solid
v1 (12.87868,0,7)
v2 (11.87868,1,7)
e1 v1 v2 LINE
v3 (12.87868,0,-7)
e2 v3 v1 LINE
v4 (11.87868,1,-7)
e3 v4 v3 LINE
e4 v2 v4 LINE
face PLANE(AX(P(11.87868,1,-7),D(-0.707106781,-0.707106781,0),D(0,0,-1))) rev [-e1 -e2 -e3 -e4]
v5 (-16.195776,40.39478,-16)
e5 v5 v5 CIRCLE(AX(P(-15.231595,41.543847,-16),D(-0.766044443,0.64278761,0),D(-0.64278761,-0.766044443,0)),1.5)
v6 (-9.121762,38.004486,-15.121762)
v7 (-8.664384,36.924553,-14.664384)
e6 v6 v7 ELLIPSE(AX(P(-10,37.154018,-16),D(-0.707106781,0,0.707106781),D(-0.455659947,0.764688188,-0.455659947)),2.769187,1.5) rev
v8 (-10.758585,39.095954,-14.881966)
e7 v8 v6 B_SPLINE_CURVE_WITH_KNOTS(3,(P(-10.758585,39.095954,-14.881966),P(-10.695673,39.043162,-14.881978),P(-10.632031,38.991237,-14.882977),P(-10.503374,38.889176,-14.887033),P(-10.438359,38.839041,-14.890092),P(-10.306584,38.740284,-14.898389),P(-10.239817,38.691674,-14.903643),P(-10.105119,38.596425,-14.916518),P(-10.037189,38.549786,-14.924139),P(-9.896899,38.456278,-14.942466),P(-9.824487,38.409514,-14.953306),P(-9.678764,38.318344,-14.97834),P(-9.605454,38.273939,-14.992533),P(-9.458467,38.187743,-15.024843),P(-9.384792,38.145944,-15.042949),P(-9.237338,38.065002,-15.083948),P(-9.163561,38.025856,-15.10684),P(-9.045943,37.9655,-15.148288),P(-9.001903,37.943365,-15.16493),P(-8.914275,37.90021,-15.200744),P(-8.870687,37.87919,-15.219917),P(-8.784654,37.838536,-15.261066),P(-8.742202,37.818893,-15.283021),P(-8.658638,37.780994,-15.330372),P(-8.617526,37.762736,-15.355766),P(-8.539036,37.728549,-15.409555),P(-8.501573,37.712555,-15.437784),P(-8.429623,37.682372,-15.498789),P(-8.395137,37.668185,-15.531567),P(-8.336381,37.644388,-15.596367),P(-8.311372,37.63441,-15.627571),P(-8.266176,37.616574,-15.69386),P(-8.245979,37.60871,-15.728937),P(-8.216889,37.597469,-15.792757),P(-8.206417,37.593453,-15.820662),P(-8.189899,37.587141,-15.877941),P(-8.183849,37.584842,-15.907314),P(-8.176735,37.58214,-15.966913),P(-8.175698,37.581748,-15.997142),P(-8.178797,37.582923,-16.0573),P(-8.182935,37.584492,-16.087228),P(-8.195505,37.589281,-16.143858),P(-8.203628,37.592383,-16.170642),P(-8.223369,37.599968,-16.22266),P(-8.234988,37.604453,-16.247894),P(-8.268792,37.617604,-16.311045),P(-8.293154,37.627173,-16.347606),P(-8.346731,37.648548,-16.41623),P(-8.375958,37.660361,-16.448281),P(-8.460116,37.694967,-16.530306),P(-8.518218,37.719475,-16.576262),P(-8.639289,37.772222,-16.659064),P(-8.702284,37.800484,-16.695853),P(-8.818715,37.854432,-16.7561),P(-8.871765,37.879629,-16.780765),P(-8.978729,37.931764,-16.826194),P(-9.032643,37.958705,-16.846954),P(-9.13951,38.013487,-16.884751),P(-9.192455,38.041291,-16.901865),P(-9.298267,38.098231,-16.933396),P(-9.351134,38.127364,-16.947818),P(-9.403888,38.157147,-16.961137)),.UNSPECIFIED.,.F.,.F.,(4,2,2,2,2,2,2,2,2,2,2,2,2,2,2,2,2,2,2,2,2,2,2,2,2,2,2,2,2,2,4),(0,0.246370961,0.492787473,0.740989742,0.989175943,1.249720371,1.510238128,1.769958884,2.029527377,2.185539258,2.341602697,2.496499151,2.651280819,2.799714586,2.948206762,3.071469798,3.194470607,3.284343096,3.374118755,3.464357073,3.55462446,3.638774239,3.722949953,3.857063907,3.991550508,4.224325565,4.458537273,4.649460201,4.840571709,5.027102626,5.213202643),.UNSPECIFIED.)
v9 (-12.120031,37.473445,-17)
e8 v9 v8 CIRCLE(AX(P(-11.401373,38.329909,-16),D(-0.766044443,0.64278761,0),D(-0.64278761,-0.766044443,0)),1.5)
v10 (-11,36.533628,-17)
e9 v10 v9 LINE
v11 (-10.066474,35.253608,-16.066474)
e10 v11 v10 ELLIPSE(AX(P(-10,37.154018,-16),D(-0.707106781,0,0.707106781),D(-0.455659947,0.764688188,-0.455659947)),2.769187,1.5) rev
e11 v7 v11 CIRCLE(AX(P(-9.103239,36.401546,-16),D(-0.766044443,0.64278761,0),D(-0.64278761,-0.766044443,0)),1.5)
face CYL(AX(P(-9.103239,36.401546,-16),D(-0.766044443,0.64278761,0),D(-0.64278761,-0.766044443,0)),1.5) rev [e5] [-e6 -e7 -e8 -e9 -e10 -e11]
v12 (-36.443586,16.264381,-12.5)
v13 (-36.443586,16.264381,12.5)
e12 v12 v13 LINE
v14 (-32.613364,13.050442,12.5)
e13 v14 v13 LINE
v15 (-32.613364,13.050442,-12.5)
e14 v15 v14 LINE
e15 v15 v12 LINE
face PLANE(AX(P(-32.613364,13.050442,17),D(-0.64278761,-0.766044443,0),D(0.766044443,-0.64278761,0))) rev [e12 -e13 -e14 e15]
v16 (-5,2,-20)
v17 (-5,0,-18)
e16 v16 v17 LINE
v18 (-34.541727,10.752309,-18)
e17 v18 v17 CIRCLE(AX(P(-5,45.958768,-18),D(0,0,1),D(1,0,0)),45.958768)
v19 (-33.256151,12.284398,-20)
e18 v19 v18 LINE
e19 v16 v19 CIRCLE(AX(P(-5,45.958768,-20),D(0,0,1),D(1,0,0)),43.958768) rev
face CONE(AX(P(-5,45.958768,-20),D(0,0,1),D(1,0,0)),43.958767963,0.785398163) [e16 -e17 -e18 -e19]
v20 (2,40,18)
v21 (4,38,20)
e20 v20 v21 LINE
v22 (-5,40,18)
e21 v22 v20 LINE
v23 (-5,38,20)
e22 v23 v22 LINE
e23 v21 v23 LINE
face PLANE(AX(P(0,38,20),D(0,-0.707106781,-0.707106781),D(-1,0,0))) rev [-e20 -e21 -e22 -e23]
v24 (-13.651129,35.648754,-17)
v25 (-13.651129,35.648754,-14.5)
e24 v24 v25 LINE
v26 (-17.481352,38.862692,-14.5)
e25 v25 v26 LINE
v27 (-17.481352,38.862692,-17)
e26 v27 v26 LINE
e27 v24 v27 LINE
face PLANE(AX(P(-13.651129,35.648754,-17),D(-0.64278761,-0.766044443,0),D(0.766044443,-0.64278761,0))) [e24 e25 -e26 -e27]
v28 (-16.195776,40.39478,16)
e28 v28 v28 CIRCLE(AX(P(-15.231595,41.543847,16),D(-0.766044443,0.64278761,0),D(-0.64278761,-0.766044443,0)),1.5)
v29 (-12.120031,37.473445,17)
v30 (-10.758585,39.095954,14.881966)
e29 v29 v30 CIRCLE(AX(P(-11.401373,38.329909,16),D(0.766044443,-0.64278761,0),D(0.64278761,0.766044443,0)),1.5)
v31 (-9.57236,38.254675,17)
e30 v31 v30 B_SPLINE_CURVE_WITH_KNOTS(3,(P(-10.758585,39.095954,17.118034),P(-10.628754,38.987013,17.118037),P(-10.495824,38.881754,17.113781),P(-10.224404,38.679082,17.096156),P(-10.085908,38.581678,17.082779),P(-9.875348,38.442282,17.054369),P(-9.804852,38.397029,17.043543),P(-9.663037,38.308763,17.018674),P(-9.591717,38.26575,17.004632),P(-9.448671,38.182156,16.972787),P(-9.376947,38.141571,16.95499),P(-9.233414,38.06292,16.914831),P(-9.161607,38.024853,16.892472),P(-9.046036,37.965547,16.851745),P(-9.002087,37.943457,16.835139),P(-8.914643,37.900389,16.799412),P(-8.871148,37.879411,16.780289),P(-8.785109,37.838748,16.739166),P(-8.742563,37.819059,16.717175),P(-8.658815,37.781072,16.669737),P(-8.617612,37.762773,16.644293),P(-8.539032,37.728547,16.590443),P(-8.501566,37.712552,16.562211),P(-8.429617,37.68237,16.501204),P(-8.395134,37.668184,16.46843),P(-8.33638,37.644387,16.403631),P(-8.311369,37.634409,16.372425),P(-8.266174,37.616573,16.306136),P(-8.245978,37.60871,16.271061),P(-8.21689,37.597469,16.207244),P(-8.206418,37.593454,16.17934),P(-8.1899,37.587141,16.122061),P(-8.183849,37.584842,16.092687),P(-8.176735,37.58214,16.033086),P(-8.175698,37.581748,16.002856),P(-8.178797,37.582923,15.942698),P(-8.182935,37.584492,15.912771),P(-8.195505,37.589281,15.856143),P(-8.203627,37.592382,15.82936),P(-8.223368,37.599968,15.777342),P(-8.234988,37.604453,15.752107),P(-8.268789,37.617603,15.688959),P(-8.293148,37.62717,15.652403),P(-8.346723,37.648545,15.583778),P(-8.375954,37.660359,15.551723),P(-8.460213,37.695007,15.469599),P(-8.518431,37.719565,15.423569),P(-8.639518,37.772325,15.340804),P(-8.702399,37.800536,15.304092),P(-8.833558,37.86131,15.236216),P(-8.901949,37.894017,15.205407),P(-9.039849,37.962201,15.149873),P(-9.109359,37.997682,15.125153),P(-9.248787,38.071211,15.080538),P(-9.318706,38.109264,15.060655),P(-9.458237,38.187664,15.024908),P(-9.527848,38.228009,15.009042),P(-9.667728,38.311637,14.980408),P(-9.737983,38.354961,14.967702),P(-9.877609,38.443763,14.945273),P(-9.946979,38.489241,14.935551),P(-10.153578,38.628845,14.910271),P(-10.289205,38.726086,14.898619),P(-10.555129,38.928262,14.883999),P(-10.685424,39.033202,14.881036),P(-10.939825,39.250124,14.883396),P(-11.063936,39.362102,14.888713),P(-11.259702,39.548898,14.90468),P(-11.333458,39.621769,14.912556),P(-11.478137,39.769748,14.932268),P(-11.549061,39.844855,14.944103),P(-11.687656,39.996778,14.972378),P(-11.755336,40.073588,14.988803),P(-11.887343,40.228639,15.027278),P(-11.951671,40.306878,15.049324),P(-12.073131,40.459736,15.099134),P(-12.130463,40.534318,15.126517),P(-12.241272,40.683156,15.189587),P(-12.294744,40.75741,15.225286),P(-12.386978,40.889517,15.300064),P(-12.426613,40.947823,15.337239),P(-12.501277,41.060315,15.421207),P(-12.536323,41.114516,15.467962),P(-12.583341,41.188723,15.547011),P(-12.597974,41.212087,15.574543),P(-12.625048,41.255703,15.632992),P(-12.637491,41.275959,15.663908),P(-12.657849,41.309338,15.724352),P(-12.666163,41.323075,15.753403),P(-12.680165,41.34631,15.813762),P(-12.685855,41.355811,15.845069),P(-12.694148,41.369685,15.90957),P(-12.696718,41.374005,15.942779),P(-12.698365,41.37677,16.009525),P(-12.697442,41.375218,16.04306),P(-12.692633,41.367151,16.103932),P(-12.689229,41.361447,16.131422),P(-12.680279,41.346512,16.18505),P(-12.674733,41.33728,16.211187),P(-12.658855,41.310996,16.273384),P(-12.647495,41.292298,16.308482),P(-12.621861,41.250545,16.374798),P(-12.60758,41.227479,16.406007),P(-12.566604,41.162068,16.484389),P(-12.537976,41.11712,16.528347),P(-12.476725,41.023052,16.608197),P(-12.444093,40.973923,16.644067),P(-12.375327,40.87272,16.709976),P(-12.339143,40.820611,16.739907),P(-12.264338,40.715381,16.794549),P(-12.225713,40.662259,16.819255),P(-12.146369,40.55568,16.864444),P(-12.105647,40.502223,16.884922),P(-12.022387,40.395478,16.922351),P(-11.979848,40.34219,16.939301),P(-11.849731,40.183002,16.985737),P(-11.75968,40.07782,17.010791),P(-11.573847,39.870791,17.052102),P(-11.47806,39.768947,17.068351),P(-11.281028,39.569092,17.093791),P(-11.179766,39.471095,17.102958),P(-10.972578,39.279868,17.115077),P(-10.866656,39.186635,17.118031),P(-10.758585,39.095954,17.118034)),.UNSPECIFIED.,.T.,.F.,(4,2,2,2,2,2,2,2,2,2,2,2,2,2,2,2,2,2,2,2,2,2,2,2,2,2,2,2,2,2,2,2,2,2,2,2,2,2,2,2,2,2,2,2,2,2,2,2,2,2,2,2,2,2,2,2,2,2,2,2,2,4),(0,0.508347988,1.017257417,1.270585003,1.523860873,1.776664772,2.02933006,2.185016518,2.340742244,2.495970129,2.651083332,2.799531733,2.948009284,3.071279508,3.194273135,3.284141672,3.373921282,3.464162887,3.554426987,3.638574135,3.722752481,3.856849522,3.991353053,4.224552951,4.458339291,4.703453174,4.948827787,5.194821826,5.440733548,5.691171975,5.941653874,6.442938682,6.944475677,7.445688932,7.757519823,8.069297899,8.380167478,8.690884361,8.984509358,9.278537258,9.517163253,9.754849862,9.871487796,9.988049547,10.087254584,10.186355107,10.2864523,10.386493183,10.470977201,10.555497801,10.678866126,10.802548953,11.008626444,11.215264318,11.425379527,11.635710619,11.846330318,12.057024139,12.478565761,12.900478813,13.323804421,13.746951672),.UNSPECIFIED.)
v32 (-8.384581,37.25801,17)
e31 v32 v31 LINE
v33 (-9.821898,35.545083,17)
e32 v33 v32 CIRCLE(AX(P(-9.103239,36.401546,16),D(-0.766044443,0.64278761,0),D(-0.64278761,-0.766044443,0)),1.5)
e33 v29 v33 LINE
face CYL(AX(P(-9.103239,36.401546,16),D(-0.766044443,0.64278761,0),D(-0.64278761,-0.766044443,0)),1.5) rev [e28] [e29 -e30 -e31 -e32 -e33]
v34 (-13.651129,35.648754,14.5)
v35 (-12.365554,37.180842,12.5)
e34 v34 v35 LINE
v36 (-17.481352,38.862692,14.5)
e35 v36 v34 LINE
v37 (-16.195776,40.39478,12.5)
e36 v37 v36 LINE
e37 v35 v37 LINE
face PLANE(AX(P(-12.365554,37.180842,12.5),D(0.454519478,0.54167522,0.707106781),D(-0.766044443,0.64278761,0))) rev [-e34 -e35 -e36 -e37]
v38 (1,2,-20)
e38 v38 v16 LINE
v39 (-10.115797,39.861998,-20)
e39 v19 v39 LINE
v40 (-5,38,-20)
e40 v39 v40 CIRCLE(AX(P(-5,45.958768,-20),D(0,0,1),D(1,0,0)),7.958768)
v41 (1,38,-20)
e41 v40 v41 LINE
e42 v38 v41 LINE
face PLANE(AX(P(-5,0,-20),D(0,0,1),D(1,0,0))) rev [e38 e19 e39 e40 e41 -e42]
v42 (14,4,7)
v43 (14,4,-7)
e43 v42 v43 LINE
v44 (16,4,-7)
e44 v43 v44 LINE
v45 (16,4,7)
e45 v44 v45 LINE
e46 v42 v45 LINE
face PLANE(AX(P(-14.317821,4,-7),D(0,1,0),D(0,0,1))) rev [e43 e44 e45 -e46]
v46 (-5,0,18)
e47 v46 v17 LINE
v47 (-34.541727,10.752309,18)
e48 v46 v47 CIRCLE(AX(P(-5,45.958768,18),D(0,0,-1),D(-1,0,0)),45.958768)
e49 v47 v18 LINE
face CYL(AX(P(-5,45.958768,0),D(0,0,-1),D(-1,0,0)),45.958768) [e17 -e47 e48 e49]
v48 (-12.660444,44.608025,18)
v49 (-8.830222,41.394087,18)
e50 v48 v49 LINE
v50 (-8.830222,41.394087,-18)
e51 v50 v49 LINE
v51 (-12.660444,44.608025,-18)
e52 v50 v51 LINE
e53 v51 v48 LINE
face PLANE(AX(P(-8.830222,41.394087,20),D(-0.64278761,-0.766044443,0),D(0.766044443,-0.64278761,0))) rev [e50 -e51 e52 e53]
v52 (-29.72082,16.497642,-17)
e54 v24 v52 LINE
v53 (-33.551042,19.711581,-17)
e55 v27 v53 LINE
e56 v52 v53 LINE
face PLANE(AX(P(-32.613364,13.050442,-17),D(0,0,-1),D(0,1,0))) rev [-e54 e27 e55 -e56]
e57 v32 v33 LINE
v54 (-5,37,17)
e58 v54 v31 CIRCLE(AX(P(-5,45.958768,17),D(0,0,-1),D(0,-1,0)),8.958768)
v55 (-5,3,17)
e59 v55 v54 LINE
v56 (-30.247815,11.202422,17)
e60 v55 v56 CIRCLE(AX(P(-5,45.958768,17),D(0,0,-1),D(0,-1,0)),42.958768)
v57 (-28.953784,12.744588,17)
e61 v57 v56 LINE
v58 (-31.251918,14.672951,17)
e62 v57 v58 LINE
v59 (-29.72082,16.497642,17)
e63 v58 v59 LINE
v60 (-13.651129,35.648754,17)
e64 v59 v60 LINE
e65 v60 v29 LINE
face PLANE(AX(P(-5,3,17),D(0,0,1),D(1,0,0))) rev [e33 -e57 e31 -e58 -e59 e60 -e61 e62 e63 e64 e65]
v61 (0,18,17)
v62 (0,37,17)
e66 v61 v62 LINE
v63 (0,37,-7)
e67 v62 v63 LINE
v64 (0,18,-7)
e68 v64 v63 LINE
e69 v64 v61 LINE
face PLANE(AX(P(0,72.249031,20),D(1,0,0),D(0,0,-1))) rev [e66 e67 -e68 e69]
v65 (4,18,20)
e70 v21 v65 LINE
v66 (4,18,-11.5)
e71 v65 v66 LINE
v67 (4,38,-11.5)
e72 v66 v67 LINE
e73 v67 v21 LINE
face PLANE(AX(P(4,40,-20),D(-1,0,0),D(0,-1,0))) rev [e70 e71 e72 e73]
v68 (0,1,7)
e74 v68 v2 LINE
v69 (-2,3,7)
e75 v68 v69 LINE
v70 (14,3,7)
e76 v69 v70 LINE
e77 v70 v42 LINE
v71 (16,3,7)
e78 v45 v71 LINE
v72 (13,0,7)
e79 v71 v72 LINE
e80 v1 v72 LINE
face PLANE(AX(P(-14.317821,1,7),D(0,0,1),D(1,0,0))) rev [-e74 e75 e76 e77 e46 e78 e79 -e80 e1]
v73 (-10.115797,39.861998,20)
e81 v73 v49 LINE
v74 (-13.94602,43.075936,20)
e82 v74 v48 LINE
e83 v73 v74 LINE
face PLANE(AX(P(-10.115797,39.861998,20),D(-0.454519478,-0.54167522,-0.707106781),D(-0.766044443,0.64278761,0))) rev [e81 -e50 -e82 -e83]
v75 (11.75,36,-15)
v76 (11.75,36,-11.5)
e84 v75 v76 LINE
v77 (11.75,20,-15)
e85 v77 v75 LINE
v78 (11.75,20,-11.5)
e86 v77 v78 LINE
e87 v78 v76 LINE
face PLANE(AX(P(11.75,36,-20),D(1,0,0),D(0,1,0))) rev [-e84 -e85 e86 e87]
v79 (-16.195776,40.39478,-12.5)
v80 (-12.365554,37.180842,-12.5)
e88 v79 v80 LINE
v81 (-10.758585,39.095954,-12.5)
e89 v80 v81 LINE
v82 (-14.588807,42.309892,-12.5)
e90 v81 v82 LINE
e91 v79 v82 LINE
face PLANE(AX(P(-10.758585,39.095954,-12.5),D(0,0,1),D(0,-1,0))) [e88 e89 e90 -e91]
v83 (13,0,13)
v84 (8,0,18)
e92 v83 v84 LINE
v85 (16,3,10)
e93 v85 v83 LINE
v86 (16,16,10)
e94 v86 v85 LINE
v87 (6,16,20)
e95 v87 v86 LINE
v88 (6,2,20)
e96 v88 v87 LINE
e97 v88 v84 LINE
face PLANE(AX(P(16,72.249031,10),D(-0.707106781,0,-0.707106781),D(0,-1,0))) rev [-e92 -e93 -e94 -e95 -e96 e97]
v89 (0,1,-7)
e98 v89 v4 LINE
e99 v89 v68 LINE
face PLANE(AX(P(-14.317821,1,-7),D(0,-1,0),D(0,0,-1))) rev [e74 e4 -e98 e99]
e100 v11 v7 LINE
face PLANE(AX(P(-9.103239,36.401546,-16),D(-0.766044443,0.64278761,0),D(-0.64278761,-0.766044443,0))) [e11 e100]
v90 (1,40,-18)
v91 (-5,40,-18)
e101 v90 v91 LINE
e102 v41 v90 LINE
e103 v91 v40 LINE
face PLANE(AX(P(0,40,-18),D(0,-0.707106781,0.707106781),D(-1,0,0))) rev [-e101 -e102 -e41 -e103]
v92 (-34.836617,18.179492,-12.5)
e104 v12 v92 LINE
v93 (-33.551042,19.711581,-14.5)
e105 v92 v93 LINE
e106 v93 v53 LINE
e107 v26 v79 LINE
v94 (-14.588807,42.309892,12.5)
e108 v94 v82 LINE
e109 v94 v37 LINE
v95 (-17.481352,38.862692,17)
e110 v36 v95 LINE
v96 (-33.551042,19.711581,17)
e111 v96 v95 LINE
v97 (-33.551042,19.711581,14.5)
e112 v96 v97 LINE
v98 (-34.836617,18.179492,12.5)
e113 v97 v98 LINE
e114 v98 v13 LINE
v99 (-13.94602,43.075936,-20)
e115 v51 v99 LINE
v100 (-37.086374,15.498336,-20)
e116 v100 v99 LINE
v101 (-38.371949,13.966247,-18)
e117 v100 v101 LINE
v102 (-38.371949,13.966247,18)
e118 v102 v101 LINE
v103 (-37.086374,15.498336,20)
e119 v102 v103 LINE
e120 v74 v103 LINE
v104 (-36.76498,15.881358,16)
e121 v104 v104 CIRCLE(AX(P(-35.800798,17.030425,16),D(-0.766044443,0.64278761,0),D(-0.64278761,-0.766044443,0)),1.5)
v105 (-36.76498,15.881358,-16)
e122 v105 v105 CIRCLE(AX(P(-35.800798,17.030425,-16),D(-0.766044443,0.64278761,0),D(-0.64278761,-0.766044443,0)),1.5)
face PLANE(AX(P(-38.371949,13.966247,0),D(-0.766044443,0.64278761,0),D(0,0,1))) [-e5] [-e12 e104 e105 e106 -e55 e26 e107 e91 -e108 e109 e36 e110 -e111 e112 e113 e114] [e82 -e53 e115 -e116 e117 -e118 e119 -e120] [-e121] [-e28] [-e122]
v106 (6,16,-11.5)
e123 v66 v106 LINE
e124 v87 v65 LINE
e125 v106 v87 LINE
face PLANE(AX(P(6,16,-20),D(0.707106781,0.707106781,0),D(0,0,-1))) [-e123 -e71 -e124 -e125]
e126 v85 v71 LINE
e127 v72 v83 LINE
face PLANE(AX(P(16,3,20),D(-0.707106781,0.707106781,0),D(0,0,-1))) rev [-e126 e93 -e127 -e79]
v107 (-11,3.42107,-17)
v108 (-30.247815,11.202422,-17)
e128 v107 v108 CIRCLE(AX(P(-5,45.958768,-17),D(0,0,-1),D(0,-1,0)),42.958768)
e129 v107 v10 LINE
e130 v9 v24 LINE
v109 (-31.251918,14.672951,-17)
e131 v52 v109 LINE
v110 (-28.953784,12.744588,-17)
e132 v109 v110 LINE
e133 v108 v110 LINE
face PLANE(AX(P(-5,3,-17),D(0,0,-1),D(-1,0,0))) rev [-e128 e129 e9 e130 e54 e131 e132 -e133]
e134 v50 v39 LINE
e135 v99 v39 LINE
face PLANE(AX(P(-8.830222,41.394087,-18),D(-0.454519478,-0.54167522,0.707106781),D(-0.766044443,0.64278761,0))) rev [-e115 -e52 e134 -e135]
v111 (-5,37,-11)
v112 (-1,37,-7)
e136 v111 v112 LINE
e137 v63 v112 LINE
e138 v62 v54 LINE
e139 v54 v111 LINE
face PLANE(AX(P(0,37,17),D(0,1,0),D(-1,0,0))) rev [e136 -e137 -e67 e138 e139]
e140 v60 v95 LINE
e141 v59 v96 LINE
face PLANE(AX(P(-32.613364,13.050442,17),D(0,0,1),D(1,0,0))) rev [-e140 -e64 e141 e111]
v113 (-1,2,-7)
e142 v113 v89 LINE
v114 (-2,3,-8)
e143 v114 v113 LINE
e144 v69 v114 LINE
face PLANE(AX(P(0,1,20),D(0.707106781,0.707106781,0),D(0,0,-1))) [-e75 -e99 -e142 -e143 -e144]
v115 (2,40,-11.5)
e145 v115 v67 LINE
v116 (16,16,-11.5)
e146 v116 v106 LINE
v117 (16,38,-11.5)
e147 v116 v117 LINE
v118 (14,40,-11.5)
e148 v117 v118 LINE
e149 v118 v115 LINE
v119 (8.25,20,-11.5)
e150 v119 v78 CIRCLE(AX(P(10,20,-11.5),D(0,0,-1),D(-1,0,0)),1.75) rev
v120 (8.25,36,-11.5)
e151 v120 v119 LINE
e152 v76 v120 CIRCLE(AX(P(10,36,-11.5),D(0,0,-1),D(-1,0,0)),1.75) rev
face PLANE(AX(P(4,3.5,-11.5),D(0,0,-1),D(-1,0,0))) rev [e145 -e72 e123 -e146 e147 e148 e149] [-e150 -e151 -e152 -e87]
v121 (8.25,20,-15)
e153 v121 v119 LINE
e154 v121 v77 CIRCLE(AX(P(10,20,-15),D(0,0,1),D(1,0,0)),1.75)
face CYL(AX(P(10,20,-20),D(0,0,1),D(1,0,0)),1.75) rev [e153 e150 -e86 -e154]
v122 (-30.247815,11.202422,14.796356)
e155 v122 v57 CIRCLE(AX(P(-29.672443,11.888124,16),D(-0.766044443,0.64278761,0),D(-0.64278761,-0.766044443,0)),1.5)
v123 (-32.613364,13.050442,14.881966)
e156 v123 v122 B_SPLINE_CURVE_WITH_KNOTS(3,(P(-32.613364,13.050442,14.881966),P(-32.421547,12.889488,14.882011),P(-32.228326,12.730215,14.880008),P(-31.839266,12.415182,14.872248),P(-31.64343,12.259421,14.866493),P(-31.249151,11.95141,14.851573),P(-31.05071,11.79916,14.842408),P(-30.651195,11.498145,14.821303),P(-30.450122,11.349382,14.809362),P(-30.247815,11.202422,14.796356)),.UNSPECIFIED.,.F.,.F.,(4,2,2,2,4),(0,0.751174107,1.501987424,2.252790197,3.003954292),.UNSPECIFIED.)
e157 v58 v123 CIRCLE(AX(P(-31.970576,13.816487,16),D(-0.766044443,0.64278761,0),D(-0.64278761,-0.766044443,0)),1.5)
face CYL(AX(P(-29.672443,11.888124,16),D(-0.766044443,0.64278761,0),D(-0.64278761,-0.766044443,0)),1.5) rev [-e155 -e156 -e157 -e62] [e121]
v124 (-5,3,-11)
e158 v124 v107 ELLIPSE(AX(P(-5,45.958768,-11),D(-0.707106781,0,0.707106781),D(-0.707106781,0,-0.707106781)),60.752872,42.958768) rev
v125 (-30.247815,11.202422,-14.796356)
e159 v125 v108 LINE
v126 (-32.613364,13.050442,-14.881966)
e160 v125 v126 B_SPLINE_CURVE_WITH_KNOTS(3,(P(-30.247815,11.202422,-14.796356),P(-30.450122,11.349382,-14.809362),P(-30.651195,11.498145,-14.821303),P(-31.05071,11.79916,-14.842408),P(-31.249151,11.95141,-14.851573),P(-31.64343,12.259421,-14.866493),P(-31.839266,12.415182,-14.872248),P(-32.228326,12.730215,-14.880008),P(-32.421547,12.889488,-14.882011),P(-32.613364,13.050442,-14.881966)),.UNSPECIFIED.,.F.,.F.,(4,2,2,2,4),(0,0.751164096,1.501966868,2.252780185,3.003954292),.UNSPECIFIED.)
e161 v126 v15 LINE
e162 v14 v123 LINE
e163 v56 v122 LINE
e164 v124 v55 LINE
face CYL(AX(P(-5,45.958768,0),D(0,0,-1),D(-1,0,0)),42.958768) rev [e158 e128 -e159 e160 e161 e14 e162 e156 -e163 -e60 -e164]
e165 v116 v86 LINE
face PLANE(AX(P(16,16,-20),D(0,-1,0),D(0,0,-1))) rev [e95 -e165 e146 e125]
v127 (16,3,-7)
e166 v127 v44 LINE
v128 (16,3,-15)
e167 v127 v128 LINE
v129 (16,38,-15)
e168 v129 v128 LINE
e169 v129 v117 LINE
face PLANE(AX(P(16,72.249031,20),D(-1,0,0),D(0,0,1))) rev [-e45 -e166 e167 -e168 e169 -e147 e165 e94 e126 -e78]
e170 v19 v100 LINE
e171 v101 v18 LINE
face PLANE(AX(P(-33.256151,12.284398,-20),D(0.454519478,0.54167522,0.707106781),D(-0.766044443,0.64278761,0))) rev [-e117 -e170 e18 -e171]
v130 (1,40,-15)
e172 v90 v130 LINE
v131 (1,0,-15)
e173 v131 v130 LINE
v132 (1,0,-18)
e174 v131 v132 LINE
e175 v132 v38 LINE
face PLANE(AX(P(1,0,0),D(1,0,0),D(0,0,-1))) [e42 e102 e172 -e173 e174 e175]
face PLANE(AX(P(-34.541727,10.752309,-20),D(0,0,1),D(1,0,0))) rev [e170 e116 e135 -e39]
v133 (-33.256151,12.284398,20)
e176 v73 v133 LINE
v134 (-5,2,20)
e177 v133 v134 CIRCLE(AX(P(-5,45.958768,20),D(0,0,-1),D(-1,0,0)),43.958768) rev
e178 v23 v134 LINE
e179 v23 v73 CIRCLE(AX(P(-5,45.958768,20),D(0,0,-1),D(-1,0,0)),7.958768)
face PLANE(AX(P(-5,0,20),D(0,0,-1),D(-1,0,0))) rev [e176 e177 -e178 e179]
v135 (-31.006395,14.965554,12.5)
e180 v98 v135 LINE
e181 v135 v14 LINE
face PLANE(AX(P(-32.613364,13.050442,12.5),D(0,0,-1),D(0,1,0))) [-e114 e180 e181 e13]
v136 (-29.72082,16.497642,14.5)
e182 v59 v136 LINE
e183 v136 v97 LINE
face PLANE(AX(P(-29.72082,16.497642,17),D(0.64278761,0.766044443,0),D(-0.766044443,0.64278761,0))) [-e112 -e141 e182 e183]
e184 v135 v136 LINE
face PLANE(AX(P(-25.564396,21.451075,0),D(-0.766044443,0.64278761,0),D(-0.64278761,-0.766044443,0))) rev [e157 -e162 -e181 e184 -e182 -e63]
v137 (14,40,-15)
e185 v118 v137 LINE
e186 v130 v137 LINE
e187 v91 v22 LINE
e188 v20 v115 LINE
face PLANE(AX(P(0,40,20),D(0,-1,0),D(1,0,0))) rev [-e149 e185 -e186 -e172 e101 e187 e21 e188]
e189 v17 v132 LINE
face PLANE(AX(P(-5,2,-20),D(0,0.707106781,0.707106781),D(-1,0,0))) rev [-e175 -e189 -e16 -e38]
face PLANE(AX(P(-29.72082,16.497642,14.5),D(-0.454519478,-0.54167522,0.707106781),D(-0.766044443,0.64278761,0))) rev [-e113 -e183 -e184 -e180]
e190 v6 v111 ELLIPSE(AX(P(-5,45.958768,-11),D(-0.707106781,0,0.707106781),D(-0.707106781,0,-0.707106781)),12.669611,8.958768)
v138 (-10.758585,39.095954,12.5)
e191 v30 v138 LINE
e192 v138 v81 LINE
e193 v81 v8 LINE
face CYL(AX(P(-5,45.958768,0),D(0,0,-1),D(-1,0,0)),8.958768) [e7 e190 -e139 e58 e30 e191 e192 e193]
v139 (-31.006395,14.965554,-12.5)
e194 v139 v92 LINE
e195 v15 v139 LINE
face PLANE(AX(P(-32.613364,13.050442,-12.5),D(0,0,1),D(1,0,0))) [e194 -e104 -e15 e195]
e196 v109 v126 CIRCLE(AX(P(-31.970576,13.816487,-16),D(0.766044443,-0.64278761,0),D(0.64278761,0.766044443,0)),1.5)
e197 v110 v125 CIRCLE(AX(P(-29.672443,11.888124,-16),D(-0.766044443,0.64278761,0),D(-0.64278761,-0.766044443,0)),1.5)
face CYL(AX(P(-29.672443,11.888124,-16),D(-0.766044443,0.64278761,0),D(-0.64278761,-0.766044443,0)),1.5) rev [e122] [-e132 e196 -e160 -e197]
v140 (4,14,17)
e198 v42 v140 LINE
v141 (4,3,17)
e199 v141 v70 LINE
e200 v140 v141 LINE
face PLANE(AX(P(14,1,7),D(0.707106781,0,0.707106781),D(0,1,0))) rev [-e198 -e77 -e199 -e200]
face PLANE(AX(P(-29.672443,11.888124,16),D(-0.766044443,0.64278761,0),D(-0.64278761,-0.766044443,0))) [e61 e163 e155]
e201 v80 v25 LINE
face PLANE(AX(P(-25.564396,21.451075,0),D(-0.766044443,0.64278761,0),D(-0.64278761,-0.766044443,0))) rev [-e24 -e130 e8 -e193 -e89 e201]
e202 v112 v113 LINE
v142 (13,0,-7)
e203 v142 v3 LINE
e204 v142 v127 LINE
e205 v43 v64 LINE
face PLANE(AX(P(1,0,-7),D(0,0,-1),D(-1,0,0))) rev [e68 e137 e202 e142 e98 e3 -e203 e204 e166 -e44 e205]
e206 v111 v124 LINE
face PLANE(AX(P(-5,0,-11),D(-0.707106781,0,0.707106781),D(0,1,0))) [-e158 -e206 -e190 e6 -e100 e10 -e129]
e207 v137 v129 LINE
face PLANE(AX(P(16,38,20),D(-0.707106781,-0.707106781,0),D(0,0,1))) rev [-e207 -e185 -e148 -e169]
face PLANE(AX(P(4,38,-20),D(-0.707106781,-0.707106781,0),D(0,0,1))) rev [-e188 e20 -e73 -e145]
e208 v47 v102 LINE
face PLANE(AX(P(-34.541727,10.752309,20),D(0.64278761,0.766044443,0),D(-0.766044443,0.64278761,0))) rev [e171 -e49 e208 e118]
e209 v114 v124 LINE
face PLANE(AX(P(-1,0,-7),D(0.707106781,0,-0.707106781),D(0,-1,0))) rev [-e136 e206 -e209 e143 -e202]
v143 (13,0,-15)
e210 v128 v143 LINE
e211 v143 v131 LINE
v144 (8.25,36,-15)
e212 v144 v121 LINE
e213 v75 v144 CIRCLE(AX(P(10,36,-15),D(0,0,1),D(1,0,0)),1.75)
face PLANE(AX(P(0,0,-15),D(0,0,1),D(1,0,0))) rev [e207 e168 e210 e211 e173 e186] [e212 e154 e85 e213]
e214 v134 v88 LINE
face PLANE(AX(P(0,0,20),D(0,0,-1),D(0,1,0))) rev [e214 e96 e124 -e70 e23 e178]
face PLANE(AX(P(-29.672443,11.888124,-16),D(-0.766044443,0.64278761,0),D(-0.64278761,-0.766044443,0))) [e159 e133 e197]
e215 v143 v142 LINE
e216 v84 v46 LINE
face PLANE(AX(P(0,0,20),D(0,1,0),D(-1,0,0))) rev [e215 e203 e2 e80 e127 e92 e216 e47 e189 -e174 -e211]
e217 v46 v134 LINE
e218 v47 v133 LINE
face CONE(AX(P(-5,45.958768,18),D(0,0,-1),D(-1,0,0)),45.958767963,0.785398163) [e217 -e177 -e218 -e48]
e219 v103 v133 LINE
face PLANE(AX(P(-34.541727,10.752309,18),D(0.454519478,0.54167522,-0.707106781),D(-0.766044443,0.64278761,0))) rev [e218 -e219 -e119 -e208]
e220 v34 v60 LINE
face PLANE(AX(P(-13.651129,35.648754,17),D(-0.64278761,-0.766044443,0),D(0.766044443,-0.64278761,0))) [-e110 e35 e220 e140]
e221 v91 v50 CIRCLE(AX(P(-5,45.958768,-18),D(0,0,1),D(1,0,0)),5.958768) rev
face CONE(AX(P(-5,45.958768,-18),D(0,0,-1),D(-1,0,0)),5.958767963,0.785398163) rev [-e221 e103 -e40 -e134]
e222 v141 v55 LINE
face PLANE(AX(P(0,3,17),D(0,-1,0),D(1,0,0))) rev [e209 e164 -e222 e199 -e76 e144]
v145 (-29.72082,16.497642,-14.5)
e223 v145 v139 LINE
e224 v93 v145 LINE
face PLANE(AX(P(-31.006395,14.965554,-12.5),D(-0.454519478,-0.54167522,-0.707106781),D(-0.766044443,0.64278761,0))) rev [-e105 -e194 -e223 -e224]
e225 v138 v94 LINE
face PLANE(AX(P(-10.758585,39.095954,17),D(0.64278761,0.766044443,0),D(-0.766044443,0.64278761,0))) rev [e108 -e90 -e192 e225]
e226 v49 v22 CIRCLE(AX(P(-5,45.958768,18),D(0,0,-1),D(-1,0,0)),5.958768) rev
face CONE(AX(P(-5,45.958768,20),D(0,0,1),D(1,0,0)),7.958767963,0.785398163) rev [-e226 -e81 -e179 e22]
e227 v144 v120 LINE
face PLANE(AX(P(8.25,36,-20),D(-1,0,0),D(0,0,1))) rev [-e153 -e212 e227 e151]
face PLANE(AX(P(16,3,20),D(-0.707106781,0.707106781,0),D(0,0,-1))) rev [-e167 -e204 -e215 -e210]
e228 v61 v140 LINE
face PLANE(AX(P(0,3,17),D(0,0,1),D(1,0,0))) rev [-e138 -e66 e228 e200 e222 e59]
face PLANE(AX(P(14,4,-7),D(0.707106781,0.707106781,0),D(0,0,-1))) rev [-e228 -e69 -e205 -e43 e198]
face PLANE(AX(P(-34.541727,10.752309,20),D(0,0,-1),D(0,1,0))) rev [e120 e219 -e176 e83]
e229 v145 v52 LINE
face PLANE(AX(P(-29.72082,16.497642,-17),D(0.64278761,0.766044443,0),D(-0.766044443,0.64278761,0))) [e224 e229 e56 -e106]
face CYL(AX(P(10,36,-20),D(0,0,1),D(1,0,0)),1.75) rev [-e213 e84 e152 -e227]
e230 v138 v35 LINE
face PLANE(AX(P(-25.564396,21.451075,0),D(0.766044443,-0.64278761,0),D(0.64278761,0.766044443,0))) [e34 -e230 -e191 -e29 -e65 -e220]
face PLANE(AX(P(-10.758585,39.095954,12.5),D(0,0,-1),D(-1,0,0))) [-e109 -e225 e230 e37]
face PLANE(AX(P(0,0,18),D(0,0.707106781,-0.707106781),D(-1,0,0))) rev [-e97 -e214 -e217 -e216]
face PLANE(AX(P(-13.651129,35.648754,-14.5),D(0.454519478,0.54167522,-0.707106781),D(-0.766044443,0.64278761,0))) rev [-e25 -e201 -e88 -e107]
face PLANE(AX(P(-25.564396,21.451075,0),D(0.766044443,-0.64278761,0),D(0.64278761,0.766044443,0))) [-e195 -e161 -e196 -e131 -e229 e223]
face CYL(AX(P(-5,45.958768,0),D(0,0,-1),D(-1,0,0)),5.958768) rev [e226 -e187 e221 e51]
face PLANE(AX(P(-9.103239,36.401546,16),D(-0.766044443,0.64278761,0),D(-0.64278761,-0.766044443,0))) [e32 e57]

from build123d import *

# Parameters (mm, degrees)
SKETCH3_W                = 40
SKETCH3_H                = 40
SKETCH3_W_2              = 34
SKETCH3_H_2              = 34
BOSS_EXTRUDE2_REACH      = 64.147
SKETCH7_W                = 16
SKETCH7_H                = 28
BOSS_EXTRUDE5_DEPTH      = 1
BOSS_EXTRUDE5_DEPTH_BACK = 5
SKETCH8_W                = 13
SKETCH8_H                = 40
CHAMFER1_SIZE            = 6
CHAMFER2_SIZE            = 4
SKETCH9_W                = 14
SKETCH9_H                = 3
CUT_EXTRUDE1_DEPTH       = 16
SKETCH10_W               = 12
SKETCH10_H               = 24
CUT_EXTRUDE2_DEPTH       = 72.149717806
SKETCH11_W               = 15
SKETCH11_H               = 40
BOSS_EXTRUDE6_DEPTH      = 7
CUT_EXTRUDE3_DEPTH       = 66.163504693
CUT_EXTRUDE4_REACH       = 60.927
SKETCH13_W               = 12
SKETCH13_H               = 3.5
SKETCH15_W               = 4.5
SKETCH15_H               = 4.5
BOSS_EXTRUDE7_DEPTH      = 5
SKETCH14_R               = 1.5
CUT_EXTRUDE5_DEPTH       = 8
CHAMFER3_SIZE            = 14
CHAMFER7_SIZE            = 3
CHAMFER4_SIZE            = 14
CHAMFER5_SIZE            = 2
CHAMFER9_SIZE            = 2
CHAMFER10_SIZE           = 2.121320344
CHAMFER10_SIZE_2         = 1.5
CHAMFER11_SIZE           = 10
CHAMFER12_SIZE           = 2


# Some blends are built 0.0001 mm under size
with BuildPart() as part:
    # Sweep1: sweep along a path in Sketch2
    with BuildLine(Plane.XY) as sweep1_path:
        Line((0, 0), (-5, 0))
        ThreePointArc((-5, 0), (-20.718824406, 2.771652848), (-34.541726603, 10.752309152))
        Line((-34.541726603, 10.752309152), (-38.371948819, 13.966247201))
    # Sketch3 → Sweep1 (sweep)
    with BuildSketch(Plane(origin=(0, 0, 0), x_dir=(0, 0, -1), z_dir=(1, 0, 0))):
        with Locations((0, 20)):
            Rectangle(SKETCH3_W, SKETCH3_H)
        with Locations((0, 20)):
            Rectangle(SKETCH3_W_2, SKETCH3_H_2, mode=Mode.SUBTRACT)
    sweep(path=sweep1_path.line)

    # Boss-Extrude2: up to this face of the body (flat: up to its plane)
    boss_extrude2_end = Plane(part.part.faces().sort_by_distance((-2.5, 40, 0))[0])
    # Sketch7 → Boss-Extrude2 (add, up to the picked face)
    with BuildSketch(Plane(origin=(0, 0, 0), x_dir=(1, 0, 0), z_dir=(0, 1, 0)), mode=Mode.PRIVATE) as boss_extrude2_sk1:
        with Locations((8, -6)):
            Rectangle(SKETCH7_W, SKETCH7_H)
    boss_extrude2_tool1 = split(extrude(boss_extrude2_sk1.sketch, amount=BOSS_EXTRUDE2_REACH, mode=Mode.PRIVATE), bisect_by=boss_extrude2_end, keep=Keep.BOTH, mode=Mode.PRIVATE)
    add(boss_extrude2_tool1.solids().sort_by(Axis((8, 0, 6), (0, 1, 0)))[0])

    # Sketch8 → Boss-Extrude5 (add, two sides: drawn at the far end of the back side and taken through both)
    with BuildSketch(Plane(origin=(0, 0, 0), x_dir=(0, 0, -1), z_dir=(1, 0, 0)).offset(-BOSS_EXTRUDE5_DEPTH_BACK)):
        with Locations((13.5, 20)):
            Rectangle(SKETCH8_W, SKETCH8_H)
    extrude(amount=BOSS_EXTRUDE5_DEPTH + BOSS_EXTRUDE5_DEPTH_BACK)

    # Chamfer1
    chamfer1_edges = [part.edges().sort_by_distance(p)[0] for p in [
        (-5, 20, -17),
    ]]
    chamfer(chamfer1_edges, length=CHAMFER1_SIZE)

    # Chamfer2
    chamfer2_edges = [part.edges().sort_by_distance(p)[0] for p in [
        (-5, 20, -7),
    ]]
    chamfer(chamfer2_edges, length=CHAMFER2_SIZE - 0.0001)  # a hair under: the kernel refuses the full size

    # Sketch9 → Cut-Extrude1 (cut)
    with BuildSketch(Plane(origin=(16, 0, 0), x_dir=(0, 0, -1), z_dir=(1, 0, 0))):
        with Locations((0, 2.5)):
            Rectangle(SKETCH9_W, SKETCH9_H)
    extrude(amount=-CUT_EXTRUDE1_DEPTH, mode=Mode.SUBTRACT)

    # Sketch10 → Cut-Extrude2 (cut, through all)
    with BuildSketch(Plane.XY.offset(20)):
        with Locations((10, 28)):
            Rectangle(SKETCH10_W, SKETCH10_H)
    extrude(amount=-CUT_EXTRUDE2_DEPTH, mode=Mode.SUBTRACT)

    # Sketch11 → Boss-Extrude6 (add)
    with BuildSketch(Plane(origin=(0, 0, -8), x_dir=(-1, 0, 0), z_dir=(0, 0, -1))):
        with Locations((-8.5, 20)):
            Rectangle(SKETCH11_W, SKETCH11_H)
    extrude(amount=BOSS_EXTRUDE6_DEPTH)

    # Sketch12 → Cut-Extrude3 (cut, through all)
    with BuildSketch(Plane.XY.offset(-8)):
        with BuildLine():
            Line((11.75, 36), (11.75, 20))
            ThreePointArc((11.75, 20), (10, 18.25), (8.25, 20))
            Line((8.25, 20), (8.25, 36))
            ThreePointArc((8.25, 36), (10, 37.75), (11.75, 36))
        make_face()
    extrude(amount=-CUT_EXTRUDE3_DEPTH, mode=Mode.SUBTRACT)

    # Cut-Extrude4: up to this face of the body (flat: up to its plane)
    cut_extrude4_end = Plane(part.part.faces().sort_by_distance((10, 16, 6))[0])
    # Sketch13 → Cut-Extrude4 (cut, up to the picked face)
    with BuildSketch(Plane(origin=(0, 40, 0), x_dir=(1, 0, 0), z_dir=(0, 1, 0)), mode=Mode.PRIVATE) as cut_extrude4_sk1:
        with Locations((10, 9.75)):
            Rectangle(SKETCH13_W, SKETCH13_H)
    cut_extrude4_tool1 = split(extrude(cut_extrude4_sk1.sketch, amount=-CUT_EXTRUDE4_REACH, mode=Mode.PRIVATE), bisect_by=cut_extrude4_end, keep=Keep.BOTH, mode=Mode.PRIVATE)
    add(cut_extrude4_tool1.solids().sort_by(Axis((10, 40, -9.75), (0, -1, 0)))[0], mode=Mode.SUBTRACT)

    # Sketch15 → Boss-Extrude7 (add)
    with BuildSketch(Plane(origin=(-29.394618164, 24.66501326, 0), x_dir=(0, 0, 1), z_dir=(-0.7660444431189811, 0.6427876096865356, 0))):
        with Locations((-14.75, 20.783752799)):
            Rectangle(SKETCH15_W, SKETCH15_H)
        with Locations((14.75, 20.783752799)):
            Rectangle(SKETCH15_W, SKETCH15_H)
        with Locations((-14.75, -8.716247201)):
            Rectangle(SKETCH15_W, SKETCH15_H)
        with Locations((14.75, -8.716247201)):
            Rectangle(SKETCH15_W, SKETCH15_H)
    extrude(amount=-BOSS_EXTRUDE7_DEPTH)

    # Sketch14 → Cut-Extrude5 (cut)
    with BuildSketch(Plane(origin=(-29.394618164, 24.66501326, 0), x_dir=(0, 0, 1), z_dir=(-0.7660444431189811, 0.6427876096865356, 0))):
        with Locations(Location((-16, 22.033752799, 0), (0, 0, 270))):
            Circle(SKETCH14_R)
        with Locations(Location((16, 22.033752799, 0), (0, 0, 270))):
            Circle(SKETCH14_R)
        with Locations(Location((-16, -9.966247201, 0), (0, 0, 270))):
            Circle(SKETCH14_R)
        with Locations(Location((16, -9.966247201, 0), (0, 0, 270))):
            Circle(SKETCH14_R)
    extrude(amount=-CUT_EXTRUDE5_DEPTH, mode=Mode.SUBTRACT)

    # Chamfer3
    chamfer3_edges = [part.edges().sort_by_distance(p)[0] for p in [
        (0, 4, 0),
    ]]
    chamfer(chamfer3_edges, length=CHAMFER3_SIZE)

    # Chamfer7
    # the kernel refuses this chamfer: 3 mm, written as the material it takes off along each edge
    with BuildSketch(Plane(origin=(16, 0, 27.715048964), x_dir=(0.027495876610586778, 0.9996219169112968, 0), z_dir=(0, 0, -1))) as chamfer7_piece_1:
        Polygon((CHAMFER7_SIZE * 0.999621916911, -CHAMFER7_SIZE * 0.0274958766106), (-CHAMFER7_SIZE * 0.0274958766106, -CHAMFER7_SIZE * 0.999621916911), (0, 0), align=None)
    extrude(amount=50.430097928, mode=Mode.SUBTRACT)

    # Chamfer4
    # the kernel refuses this chamfer: 14 mm, written as the material it takes off along each edge
    with BuildSketch(Plane(origin=(0, 54.003561832, 7), x_dir=(-0.027495876610586376, 0, 0.9996219169112968), z_dir=(0, -1, 0))) as chamfer4_piece_1_section:
        Polygon((CHAMFER4_SIZE * 0.999621916911, -CHAMFER4_SIZE * 0.0274958766106), (-CHAMFER4_SIZE * 0.0274958766106, -CHAMFER4_SIZE * 0.999621916911), (0, 0), align=None)
    chamfer4_piece_1 = extrude(amount=51.003561832, mode=Mode.PRIVATE)
    chamfer4_piece_1 = split(chamfer4_piece_1, bisect_by=Plane(origin=(0.666666667, 16.666666667, 17), z_dir=(0, 0, -1)), keep=Keep.TOP, mode=Mode.PRIVATE)
    chamfer4_piece_1 = split(chamfer4_piece_1, bisect_by=Plane(origin=(1, 17, 12), z_dir=(-0.7071067811865476, -0.7071067811865476, 0)), keep=Keep.TOP, mode=Mode.PRIVATE)
    add(chamfer4_piece_1, mode=Mode.SUBTRACT)

    # Chamfer5
    chamfer5_edges = [part.edges().sort_by_distance(p)[0] for p in [
        (0, 3, 0),
    ]]
    chamfer(chamfer5_edges, length=CHAMFER5_SIZE - 0.0001)  # a hair under: the kernel refuses the full size

    # Chamfer9
    chamfer9_edges = [part.edges().sort_by_distance(p)[0] for p in [
        (4, 16, 4.25),
        (4, 40, 4.25),
        (16, 40, -13.25),
    ]]
    chamfer(chamfer9_edges, length=CHAMFER9_SIZE)

    # Chamfer10
    # the kernel refuses this chamfer: 2.121320344, 1.5 mm, written as the material it takes off along each edge
    with BuildSketch(Plane(origin=(14, 1, -7), x_dir=(-0.9996219169112964, 0.02749587661059746, 0), z_dir=(0, 0, 1))) as chamfer10_piece_1:
        Polygon((CHAMFER10_SIZE * 0.999621916703, CHAMFER10_SIZE * 0.0274958766049), (CHAMFER10_SIZE_2 * 0.687396915265, CHAMFER10_SIZE_2 * 0.726281956876), (0, 0), align=None)
    extrude(amount=14, mode=Mode.SUBTRACT)

    # Chamfer11
    chamfer11_edges = [part.edges().sort_by_distance(p)[0] for p in [
        (16, 9.5, 20),
    ]]
    chamfer(chamfer11_edges, length=CHAMFER11_SIZE)

    # Chamfer12
    chamfer12_edges = [part.edges().sort_by_distance(p)[0] for p in [
        (-10.745333323, 43.001055901, -20),
        (-7.038018673, 40.359357679, -20),
        (-2, 40, -20),
        (-36.456837711, 12.359278177, -20),
        (-20.718824406, 2.771652848, -20),
        (-2, 0, -20),
        (-36.456837711, 12.359278177, 20),
        (-20.718824406, 2.771652848, 20),
        (0.5, 0, 20),
        (-10.745333323, 43.001055901, 20),
        (-7.038018673, 40.359357679, 20),
        (-1.5, 40, 20),
        (-31.635930638, 18.1046115, 12.5),
        (-15.566240396, 37.255722578, 12.5),
        (-15.566240396, 37.255722578, -12.5),
        (-31.635930638, 18.1046115, -12.5),
    ]]
    chamfer(chamfer12_edges, length=CHAMFER12_SIZE)


solid = part.part
